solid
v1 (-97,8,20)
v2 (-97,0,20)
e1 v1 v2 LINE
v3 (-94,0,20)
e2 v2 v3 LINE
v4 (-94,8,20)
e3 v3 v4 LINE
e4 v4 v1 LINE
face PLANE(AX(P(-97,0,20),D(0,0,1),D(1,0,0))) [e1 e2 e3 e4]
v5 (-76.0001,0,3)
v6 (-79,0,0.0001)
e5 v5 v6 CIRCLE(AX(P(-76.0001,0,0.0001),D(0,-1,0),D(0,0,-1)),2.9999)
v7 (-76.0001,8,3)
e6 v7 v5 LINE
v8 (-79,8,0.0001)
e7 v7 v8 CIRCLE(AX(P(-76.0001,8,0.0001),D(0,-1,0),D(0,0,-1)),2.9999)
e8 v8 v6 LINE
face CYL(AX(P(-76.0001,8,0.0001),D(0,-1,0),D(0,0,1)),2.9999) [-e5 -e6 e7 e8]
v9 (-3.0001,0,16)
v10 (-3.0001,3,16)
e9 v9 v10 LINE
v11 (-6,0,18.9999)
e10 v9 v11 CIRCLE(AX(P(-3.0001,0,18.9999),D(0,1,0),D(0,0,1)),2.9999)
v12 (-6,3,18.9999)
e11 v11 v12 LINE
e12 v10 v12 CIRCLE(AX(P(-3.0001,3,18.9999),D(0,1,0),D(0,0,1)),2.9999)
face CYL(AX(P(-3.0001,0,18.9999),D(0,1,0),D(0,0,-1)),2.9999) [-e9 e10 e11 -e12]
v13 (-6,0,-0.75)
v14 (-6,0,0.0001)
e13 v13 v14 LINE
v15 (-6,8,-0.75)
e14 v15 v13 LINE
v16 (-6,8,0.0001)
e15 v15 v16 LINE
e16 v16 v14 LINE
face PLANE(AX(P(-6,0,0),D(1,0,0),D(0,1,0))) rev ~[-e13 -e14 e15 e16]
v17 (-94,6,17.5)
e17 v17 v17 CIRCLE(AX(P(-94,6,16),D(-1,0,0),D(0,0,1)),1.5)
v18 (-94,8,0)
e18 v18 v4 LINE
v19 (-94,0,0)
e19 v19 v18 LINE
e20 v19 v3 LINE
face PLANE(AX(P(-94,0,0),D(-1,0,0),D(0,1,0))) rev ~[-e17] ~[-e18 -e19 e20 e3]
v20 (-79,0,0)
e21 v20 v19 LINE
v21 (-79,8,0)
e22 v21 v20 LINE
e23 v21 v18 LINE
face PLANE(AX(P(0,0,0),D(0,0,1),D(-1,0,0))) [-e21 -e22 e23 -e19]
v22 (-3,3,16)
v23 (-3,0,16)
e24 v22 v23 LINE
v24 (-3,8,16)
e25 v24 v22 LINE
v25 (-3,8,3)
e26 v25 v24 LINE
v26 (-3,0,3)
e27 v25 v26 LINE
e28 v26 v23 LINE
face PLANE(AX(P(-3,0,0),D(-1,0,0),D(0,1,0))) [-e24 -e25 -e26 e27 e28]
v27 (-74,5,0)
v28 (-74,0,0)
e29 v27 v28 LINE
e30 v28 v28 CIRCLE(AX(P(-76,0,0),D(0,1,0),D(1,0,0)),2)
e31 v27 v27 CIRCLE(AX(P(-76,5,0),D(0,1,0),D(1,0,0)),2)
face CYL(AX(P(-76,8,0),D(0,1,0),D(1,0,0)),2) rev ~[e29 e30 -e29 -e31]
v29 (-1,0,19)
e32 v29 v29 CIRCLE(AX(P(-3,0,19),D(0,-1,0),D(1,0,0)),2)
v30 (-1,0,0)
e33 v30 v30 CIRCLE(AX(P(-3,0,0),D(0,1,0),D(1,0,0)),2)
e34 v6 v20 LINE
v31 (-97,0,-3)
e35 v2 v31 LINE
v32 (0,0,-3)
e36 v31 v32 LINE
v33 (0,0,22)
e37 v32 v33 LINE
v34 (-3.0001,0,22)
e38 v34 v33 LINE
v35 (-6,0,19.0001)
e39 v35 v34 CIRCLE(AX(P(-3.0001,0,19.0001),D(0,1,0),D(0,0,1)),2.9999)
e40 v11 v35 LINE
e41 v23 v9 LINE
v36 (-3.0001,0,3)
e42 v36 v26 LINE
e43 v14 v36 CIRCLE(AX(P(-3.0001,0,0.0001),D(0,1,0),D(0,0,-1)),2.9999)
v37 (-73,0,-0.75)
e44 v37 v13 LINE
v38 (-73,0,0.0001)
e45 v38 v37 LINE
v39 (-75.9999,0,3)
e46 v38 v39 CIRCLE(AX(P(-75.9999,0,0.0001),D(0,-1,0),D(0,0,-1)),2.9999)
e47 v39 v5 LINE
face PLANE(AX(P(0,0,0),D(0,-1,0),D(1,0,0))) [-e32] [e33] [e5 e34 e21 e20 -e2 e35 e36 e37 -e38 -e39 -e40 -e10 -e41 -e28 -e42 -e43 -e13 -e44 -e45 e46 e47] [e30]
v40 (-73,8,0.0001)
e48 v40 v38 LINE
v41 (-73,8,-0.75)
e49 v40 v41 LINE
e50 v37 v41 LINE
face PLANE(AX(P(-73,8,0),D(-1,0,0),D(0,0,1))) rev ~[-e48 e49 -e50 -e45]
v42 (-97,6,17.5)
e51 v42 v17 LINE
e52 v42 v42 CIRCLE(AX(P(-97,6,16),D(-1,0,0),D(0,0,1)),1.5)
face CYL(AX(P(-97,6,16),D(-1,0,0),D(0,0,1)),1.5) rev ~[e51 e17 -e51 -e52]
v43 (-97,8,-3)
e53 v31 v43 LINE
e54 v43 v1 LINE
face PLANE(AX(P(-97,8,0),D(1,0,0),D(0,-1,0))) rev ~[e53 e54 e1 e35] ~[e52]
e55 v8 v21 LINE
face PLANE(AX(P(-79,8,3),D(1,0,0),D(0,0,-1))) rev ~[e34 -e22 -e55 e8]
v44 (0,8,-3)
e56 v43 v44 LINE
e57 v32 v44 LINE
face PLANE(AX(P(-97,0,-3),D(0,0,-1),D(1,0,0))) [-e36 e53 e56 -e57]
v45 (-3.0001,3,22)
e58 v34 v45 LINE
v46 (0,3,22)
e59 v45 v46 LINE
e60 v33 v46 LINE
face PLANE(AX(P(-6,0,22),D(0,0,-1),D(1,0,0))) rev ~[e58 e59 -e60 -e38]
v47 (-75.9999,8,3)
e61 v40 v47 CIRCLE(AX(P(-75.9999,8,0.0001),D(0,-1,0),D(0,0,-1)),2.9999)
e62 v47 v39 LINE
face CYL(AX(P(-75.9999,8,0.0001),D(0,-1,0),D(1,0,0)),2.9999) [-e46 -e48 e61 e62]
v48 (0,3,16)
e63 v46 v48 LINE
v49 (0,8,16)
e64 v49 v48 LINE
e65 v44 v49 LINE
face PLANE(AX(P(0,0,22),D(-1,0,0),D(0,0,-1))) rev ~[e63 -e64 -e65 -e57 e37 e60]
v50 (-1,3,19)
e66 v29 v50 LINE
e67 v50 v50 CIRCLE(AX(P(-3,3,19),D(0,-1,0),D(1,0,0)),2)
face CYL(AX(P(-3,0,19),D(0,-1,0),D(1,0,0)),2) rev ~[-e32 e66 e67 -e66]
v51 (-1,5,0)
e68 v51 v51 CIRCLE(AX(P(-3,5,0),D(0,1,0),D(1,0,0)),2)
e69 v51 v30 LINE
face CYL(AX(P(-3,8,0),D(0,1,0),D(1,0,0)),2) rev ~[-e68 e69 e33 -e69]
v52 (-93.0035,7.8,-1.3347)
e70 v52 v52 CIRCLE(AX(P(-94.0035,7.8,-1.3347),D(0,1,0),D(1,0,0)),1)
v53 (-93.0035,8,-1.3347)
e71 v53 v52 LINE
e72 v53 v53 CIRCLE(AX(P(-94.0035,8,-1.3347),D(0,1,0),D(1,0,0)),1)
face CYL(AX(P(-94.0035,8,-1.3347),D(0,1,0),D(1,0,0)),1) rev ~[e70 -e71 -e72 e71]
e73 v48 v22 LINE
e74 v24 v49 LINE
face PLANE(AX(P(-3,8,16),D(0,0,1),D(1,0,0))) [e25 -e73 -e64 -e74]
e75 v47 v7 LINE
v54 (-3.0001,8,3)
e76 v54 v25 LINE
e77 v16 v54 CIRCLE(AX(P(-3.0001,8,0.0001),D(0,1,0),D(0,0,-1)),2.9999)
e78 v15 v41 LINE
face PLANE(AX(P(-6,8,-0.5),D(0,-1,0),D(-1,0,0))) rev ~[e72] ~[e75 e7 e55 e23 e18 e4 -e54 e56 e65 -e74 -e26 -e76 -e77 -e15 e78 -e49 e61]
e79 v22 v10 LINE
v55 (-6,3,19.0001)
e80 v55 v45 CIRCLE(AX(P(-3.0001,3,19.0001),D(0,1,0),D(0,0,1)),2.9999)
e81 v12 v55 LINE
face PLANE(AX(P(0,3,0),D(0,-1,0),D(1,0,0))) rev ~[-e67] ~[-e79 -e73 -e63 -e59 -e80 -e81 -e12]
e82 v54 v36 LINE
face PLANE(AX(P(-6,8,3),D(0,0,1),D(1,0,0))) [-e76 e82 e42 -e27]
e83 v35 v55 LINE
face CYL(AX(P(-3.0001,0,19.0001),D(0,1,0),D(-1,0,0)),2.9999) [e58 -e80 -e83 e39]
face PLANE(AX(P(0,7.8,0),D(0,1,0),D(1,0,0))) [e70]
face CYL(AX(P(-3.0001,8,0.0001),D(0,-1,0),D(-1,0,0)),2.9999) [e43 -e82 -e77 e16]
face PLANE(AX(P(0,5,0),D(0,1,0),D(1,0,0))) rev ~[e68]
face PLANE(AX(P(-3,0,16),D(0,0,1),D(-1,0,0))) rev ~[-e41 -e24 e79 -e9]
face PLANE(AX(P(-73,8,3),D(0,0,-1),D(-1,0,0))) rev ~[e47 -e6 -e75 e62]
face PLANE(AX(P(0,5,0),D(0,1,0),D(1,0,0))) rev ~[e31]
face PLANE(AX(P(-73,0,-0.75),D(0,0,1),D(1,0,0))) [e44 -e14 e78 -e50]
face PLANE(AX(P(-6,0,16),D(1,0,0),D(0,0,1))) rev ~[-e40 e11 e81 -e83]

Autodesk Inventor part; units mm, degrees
ref_plane "YZ Plane" through (0, 0, 0) normal (1, 0, 0) x (0, 1, 0)
ref_plane "XZ Plane" through (0, 0, 0) normal (0, 1, 0) x (-1, 0, 0)
ref_plane "XY Plane" through (0, 0, 0) normal (0, 0, 1) x (1, 0, 0)
sketch "Szkic1" plane through (0, 0, 0) normal (0, 1, 0) x (-1, 0, 0)
  line L0 (0, 0) -> (97, 0)
  line L1 (97, 0) -> (97, -3)
  line L2 (97, -3) -> (0, -3)
  line L3 (0, -3) -> (0, 0)
  dimension "d0" = 97
  dimension "d1" = 3
extrude "Wyciągnięcie proste1" add sketch "Szkic1" along normal blind 8
sketch "Szkic2" plane through (0, 8, 0) normal (0, 1, 0) x (1, 0, 0)
  circle A0 centre (-94.0035, 1.3347) radius 1
  point P0 (0, 0)
  dimension "d4" = 2
extrude "Wyciągnięcie proste2" cut sketch "Szkic2" against normal blind 0.2
sketch "Szkic3" plane through (-97, 0, 0) normal (0, 0, 1) x (1, 0, 0)
  line L0 (97, 8) -> (0, 8) projected
  line L1 (97, 0) -> (94, 0)
  line L2 (94, 0) -> (94, 8)
  line L3 (94, 8) -> (97, 8)
  line L4 (97, 8) -> (97, 0)
  line L5 (0, 0) -> (3, 0)
  line L6 (3, 0) -> (3, 8)
  line L7 (3, 8) -> (0, 8)
  line L8 (0, 8) -> (0, 0)
  dimension "d7" = 3
  dimension "d8" = 3
extrude "Wyciągnięcie proste3" add sketch "Szkic3" along normal blind 20 contours L6 L5 L8 L0
extrude "Wyciągnięcie proste4" add sketch "Szkic3" along normal blind 19 contours L4 L1 L2 L0
sketch "Szkic4" plane through (-3, 0, 0) normal (-1, 0, 0) x (0, 0, 1)
  line L0 (19, 8) -> (19, 0) projected
  line L1 (0, 8) -> (19, 8) projected
  line L2 (19, 0) -> (14, 0)
  line L3 (14, 0) -> (14, 8)
  line L4 (14, 8) -> (19, 8)
  line L5 (19, 8) -> (19, 0)
  point P0 (0, 0)
  dimension "d13" = 5
extrude "Wyciągnięcie proste5" add sketch "Szkic4" along normal blind 3
sketch "Szkic5" plane through (0, 8, 0) normal (0, 1, 0) x (1, 0, 0)
  line L0 (-94, 0) -> (-3, 0) projected
  line L1 (-3, 0) -> (-6, 0)
  line L2 (-6, 0) -> (-6, -3)
  line L3 (-6, -3) -> (-3, -3)
  line L4 (-3, -3) -> (-3, 0)
  line L5 (-79, 0) -> (-73, 0)
  line L6 (-73, 0) -> (-73, -3)
  line L7 (-73, -3) -> (-79, -3)
  line L8 (-79, -3) -> (-79, 0)
  line L9 (-3, 0) -> (-3, -14) projected
  point P0 (0, 0)
  dimension "d16" = 3
  dimension "d17" = 3
  dimension "d18" = 6
  dimension "d19" = 70
  dimension "d20" = 3
extrude "Wyciągnięcie proste6" add sketch "Szkic5" against normal blind 8
sketch "Szkic6" plane through (0, 8, 0) normal (0, 1, 0) x (1, 0, 0)
  line L0 (-3, -3) -> (-6, -3) projected
  line L1 (0, 3) -> (0, -19) projected
  line L2 (-6, -3) -> (0, 3)
  line L3 (0, -3) -> (-6, 3)
  line L4 (0, 3) -> (-97, 3) projected
  line L5 (-79, -3) -> (-79, 0) projected
  line L6 (-79, -3) -> (-73, 3)
  line L7 (-73, 3) -> (-73, -3)
  line L8 (-73, -3) -> (-79, 3)
  circle A0 centre (-76, 0) radius 2
  circle A1 centre (-3, 0) radius 2
  point P0 (0, 0)
  dimension "d23" = 4
  dimension "d24" = 4
extrude "Wyciągnięcie proste7" cut sketch "Szkic6" against normal blind 8 contours A1 L3 L2 | L2 L3 A1 | A1 L2 L3 | L2 A1 L3 | A0 L8 L6 | L6 L8 A0 | L8 L6 A0 | L8 A0 L6
sketch "Szkic7" plane through (0, 8, 0) normal (0, 1, 0) x (1, 0, 0)
  circle A0 centre (-3, 0) radius 2 projected
  circle A1 centre (-3, 0) radius 2
  circle A2 centre (-76, 0) radius 2 projected
  circle A3 centre (-76, 0) radius 2
  point P0 (0, 0)
extrude "Wyciągnięcie proste8" add sketch "Szkic7" against normal blind 3
sketch "Szkic8" plane through (-73, 0, 0) normal (0, 0, 1) x (1, 0, 0)
  line L0 (0, 8) -> (0, 0) projected
  line L1 (73, 8) -> (-24, 8) projected
  line L2 (0, 0) -> (13, 0)
  line L3 (13, 0) -> (13, 8)
  line L4 (13, 8) -> (0, 8)
  line L5 (0, 8) -> (0, 0)
  point P0 (73, 0)
  dimension "d29" = 13
extrude "Wyciągnięcie proste9" cut sketch "Szkic8" against normal blind 0.5
sketch "Szkic10" plane through (-6, 0, 0) normal (0, 0, 1) x (1, 0, 0)
  line L0 (-54, 8) -> (-54, 0) projected
  line L1 (6, 8) -> (0, 8) projected
  line L2 (-54, 0) -> (0, 0)
  line L3 (0, 0) -> (0, 8)
  line L4 (0, 8) -> (-54, 8)
  line L5 (-54, 8) -> (-54, 0)
  point P0 (6, 0)
extrude "Wyciągnięcie proste11" cut sketch "Szkic10" against normal blind 0.5
sketch "Szkic11" plane through (-73, 0, -0.5) normal (0, 0, 1) x (1, 0, 0)
  line L0 (0, 0) -> (0, 8) projected
  line L1 (67, 8) -> (67, 0) projected
  line L2 (0, 0) -> (67, 0)
  line L3 (67, 0) -> (67, 8)
  line L4 (67, 8) -> (0, 8)
  line L5 (0, 8) -> (0, 0)
  point P0 (73, 0)
extrude "Wyciągnięcie proste12" add sketch "Szkic11" along normal blind 0.25
sketch "Szkic12" plane through (-73, 0, -0.25) normal (0, 0, 1) x (1, 0, 0)
  line L0 (67, 8) -> (67, 0) projected
  line L1 (0, 0) -> (0, 8) projected
  line L2 (67, 8) -> (0, 8)
  line L3 (0, 8) -> (0, 0)
  line L4 (0, 0) -> (67, 0)
  line L5 (67, 0) -> (67, 8)
  point P0 (73, 0)
extrude "Wyciągnięcie proste13" cut sketch "Szkic12" against normal blind 0.5
sketch "Szkic13" plane through (-97, 0, -3) normal (-1, 0, 0) x (0, 0, 1)
  circle A0 centre (19, 6) radius 1.5
  line L0 (0, 8) -> (23, 8) projected
  line L1 (23, 8) -> (23, 0) projected
  point P0 (3, 0)
  dimension "d40" = 3
  dimension "d41" = 2
  dimension "d42" = 4
extrude "Wyciągnięcie proste14" cut sketch "Szkic13" against normal up to surface (3 mm away)
sketch "Szkic14" plane through (0, 8, 0) normal (0, 1, 0) x (1, 0, 0)
  line L0 (-3, -14) -> (-6, -14) projected
  line L1 (0, -19) -> (-6, -19) projected
  line L2 (-3, -14) -> (-6, -14)
  line L3 (-6, -14) -> (-6, -19)
  line L4 (-6, -19) -> (-3, -19)
  line L5 (-3, -19) -> (-3, -14)
  line L6 (0, -19) -> (-3, -19)
  line L7 (-3, -19) -> (-3, -16)
  line L8 (-3, -16) -> (0, -16)
  line L9 (0, -16) -> (0, -19)
  point P0 (0, 0)
  dimension "d45" = 3
  dimension "d46" = 3
extrude "Wyciągnięcie proste15" cut sketch "Szkic14" against normal blind 8
sketch "Szkic15" plane through (0, 0, 0) normal (0, -1, 0) x (1, 0, 0)
  line L0 (0, 16) -> (-3, 16) projected
  line L1 (0, 16) -> (-6, 16)
  line L2 (-6, 16) -> (-6, 22)
  line L3 (-6, 22) -> (0, 22)
  line L4 (0, 22) -> (0, 16)
  point P0 (0, 0)
  dimension "d49" = 6
  dimension "d50" = 6
extrude "Wyciągnięcie proste16" add sketch "Szkic15" against normal blind 3
sketch "Szkic17" plane through (0, 0, 0) normal (0, -1, 0) x (1, 0, 0)
  circle A0 centre (-3, 19) radius 2
  line L0 (0, -3) -> (0, 22) projected
  line L1 (0, 22) -> (-6, 22) projected
  point P0 (0, 0)
  point P1 (-3, 22)
  dimension "d53" = 4
  dimension "d54" = 3
  dimension "d55" = 3
extrude "Wyciągnięcie proste17" cut sketch "Szkic17" against normal blind 3
fillet "Fillet1" radius 3 2 edges at (-73, 4, 3) (-79, 4, 3)
fillet "Fillet2" radius 3 1 edges at (-6, 4, 3)
fillet "Fillet3" radius 3 2 edges at (-6, 1.5, 22) (-6, 1.5, 16)
properties material "Tworzywo sztuczne PET"
